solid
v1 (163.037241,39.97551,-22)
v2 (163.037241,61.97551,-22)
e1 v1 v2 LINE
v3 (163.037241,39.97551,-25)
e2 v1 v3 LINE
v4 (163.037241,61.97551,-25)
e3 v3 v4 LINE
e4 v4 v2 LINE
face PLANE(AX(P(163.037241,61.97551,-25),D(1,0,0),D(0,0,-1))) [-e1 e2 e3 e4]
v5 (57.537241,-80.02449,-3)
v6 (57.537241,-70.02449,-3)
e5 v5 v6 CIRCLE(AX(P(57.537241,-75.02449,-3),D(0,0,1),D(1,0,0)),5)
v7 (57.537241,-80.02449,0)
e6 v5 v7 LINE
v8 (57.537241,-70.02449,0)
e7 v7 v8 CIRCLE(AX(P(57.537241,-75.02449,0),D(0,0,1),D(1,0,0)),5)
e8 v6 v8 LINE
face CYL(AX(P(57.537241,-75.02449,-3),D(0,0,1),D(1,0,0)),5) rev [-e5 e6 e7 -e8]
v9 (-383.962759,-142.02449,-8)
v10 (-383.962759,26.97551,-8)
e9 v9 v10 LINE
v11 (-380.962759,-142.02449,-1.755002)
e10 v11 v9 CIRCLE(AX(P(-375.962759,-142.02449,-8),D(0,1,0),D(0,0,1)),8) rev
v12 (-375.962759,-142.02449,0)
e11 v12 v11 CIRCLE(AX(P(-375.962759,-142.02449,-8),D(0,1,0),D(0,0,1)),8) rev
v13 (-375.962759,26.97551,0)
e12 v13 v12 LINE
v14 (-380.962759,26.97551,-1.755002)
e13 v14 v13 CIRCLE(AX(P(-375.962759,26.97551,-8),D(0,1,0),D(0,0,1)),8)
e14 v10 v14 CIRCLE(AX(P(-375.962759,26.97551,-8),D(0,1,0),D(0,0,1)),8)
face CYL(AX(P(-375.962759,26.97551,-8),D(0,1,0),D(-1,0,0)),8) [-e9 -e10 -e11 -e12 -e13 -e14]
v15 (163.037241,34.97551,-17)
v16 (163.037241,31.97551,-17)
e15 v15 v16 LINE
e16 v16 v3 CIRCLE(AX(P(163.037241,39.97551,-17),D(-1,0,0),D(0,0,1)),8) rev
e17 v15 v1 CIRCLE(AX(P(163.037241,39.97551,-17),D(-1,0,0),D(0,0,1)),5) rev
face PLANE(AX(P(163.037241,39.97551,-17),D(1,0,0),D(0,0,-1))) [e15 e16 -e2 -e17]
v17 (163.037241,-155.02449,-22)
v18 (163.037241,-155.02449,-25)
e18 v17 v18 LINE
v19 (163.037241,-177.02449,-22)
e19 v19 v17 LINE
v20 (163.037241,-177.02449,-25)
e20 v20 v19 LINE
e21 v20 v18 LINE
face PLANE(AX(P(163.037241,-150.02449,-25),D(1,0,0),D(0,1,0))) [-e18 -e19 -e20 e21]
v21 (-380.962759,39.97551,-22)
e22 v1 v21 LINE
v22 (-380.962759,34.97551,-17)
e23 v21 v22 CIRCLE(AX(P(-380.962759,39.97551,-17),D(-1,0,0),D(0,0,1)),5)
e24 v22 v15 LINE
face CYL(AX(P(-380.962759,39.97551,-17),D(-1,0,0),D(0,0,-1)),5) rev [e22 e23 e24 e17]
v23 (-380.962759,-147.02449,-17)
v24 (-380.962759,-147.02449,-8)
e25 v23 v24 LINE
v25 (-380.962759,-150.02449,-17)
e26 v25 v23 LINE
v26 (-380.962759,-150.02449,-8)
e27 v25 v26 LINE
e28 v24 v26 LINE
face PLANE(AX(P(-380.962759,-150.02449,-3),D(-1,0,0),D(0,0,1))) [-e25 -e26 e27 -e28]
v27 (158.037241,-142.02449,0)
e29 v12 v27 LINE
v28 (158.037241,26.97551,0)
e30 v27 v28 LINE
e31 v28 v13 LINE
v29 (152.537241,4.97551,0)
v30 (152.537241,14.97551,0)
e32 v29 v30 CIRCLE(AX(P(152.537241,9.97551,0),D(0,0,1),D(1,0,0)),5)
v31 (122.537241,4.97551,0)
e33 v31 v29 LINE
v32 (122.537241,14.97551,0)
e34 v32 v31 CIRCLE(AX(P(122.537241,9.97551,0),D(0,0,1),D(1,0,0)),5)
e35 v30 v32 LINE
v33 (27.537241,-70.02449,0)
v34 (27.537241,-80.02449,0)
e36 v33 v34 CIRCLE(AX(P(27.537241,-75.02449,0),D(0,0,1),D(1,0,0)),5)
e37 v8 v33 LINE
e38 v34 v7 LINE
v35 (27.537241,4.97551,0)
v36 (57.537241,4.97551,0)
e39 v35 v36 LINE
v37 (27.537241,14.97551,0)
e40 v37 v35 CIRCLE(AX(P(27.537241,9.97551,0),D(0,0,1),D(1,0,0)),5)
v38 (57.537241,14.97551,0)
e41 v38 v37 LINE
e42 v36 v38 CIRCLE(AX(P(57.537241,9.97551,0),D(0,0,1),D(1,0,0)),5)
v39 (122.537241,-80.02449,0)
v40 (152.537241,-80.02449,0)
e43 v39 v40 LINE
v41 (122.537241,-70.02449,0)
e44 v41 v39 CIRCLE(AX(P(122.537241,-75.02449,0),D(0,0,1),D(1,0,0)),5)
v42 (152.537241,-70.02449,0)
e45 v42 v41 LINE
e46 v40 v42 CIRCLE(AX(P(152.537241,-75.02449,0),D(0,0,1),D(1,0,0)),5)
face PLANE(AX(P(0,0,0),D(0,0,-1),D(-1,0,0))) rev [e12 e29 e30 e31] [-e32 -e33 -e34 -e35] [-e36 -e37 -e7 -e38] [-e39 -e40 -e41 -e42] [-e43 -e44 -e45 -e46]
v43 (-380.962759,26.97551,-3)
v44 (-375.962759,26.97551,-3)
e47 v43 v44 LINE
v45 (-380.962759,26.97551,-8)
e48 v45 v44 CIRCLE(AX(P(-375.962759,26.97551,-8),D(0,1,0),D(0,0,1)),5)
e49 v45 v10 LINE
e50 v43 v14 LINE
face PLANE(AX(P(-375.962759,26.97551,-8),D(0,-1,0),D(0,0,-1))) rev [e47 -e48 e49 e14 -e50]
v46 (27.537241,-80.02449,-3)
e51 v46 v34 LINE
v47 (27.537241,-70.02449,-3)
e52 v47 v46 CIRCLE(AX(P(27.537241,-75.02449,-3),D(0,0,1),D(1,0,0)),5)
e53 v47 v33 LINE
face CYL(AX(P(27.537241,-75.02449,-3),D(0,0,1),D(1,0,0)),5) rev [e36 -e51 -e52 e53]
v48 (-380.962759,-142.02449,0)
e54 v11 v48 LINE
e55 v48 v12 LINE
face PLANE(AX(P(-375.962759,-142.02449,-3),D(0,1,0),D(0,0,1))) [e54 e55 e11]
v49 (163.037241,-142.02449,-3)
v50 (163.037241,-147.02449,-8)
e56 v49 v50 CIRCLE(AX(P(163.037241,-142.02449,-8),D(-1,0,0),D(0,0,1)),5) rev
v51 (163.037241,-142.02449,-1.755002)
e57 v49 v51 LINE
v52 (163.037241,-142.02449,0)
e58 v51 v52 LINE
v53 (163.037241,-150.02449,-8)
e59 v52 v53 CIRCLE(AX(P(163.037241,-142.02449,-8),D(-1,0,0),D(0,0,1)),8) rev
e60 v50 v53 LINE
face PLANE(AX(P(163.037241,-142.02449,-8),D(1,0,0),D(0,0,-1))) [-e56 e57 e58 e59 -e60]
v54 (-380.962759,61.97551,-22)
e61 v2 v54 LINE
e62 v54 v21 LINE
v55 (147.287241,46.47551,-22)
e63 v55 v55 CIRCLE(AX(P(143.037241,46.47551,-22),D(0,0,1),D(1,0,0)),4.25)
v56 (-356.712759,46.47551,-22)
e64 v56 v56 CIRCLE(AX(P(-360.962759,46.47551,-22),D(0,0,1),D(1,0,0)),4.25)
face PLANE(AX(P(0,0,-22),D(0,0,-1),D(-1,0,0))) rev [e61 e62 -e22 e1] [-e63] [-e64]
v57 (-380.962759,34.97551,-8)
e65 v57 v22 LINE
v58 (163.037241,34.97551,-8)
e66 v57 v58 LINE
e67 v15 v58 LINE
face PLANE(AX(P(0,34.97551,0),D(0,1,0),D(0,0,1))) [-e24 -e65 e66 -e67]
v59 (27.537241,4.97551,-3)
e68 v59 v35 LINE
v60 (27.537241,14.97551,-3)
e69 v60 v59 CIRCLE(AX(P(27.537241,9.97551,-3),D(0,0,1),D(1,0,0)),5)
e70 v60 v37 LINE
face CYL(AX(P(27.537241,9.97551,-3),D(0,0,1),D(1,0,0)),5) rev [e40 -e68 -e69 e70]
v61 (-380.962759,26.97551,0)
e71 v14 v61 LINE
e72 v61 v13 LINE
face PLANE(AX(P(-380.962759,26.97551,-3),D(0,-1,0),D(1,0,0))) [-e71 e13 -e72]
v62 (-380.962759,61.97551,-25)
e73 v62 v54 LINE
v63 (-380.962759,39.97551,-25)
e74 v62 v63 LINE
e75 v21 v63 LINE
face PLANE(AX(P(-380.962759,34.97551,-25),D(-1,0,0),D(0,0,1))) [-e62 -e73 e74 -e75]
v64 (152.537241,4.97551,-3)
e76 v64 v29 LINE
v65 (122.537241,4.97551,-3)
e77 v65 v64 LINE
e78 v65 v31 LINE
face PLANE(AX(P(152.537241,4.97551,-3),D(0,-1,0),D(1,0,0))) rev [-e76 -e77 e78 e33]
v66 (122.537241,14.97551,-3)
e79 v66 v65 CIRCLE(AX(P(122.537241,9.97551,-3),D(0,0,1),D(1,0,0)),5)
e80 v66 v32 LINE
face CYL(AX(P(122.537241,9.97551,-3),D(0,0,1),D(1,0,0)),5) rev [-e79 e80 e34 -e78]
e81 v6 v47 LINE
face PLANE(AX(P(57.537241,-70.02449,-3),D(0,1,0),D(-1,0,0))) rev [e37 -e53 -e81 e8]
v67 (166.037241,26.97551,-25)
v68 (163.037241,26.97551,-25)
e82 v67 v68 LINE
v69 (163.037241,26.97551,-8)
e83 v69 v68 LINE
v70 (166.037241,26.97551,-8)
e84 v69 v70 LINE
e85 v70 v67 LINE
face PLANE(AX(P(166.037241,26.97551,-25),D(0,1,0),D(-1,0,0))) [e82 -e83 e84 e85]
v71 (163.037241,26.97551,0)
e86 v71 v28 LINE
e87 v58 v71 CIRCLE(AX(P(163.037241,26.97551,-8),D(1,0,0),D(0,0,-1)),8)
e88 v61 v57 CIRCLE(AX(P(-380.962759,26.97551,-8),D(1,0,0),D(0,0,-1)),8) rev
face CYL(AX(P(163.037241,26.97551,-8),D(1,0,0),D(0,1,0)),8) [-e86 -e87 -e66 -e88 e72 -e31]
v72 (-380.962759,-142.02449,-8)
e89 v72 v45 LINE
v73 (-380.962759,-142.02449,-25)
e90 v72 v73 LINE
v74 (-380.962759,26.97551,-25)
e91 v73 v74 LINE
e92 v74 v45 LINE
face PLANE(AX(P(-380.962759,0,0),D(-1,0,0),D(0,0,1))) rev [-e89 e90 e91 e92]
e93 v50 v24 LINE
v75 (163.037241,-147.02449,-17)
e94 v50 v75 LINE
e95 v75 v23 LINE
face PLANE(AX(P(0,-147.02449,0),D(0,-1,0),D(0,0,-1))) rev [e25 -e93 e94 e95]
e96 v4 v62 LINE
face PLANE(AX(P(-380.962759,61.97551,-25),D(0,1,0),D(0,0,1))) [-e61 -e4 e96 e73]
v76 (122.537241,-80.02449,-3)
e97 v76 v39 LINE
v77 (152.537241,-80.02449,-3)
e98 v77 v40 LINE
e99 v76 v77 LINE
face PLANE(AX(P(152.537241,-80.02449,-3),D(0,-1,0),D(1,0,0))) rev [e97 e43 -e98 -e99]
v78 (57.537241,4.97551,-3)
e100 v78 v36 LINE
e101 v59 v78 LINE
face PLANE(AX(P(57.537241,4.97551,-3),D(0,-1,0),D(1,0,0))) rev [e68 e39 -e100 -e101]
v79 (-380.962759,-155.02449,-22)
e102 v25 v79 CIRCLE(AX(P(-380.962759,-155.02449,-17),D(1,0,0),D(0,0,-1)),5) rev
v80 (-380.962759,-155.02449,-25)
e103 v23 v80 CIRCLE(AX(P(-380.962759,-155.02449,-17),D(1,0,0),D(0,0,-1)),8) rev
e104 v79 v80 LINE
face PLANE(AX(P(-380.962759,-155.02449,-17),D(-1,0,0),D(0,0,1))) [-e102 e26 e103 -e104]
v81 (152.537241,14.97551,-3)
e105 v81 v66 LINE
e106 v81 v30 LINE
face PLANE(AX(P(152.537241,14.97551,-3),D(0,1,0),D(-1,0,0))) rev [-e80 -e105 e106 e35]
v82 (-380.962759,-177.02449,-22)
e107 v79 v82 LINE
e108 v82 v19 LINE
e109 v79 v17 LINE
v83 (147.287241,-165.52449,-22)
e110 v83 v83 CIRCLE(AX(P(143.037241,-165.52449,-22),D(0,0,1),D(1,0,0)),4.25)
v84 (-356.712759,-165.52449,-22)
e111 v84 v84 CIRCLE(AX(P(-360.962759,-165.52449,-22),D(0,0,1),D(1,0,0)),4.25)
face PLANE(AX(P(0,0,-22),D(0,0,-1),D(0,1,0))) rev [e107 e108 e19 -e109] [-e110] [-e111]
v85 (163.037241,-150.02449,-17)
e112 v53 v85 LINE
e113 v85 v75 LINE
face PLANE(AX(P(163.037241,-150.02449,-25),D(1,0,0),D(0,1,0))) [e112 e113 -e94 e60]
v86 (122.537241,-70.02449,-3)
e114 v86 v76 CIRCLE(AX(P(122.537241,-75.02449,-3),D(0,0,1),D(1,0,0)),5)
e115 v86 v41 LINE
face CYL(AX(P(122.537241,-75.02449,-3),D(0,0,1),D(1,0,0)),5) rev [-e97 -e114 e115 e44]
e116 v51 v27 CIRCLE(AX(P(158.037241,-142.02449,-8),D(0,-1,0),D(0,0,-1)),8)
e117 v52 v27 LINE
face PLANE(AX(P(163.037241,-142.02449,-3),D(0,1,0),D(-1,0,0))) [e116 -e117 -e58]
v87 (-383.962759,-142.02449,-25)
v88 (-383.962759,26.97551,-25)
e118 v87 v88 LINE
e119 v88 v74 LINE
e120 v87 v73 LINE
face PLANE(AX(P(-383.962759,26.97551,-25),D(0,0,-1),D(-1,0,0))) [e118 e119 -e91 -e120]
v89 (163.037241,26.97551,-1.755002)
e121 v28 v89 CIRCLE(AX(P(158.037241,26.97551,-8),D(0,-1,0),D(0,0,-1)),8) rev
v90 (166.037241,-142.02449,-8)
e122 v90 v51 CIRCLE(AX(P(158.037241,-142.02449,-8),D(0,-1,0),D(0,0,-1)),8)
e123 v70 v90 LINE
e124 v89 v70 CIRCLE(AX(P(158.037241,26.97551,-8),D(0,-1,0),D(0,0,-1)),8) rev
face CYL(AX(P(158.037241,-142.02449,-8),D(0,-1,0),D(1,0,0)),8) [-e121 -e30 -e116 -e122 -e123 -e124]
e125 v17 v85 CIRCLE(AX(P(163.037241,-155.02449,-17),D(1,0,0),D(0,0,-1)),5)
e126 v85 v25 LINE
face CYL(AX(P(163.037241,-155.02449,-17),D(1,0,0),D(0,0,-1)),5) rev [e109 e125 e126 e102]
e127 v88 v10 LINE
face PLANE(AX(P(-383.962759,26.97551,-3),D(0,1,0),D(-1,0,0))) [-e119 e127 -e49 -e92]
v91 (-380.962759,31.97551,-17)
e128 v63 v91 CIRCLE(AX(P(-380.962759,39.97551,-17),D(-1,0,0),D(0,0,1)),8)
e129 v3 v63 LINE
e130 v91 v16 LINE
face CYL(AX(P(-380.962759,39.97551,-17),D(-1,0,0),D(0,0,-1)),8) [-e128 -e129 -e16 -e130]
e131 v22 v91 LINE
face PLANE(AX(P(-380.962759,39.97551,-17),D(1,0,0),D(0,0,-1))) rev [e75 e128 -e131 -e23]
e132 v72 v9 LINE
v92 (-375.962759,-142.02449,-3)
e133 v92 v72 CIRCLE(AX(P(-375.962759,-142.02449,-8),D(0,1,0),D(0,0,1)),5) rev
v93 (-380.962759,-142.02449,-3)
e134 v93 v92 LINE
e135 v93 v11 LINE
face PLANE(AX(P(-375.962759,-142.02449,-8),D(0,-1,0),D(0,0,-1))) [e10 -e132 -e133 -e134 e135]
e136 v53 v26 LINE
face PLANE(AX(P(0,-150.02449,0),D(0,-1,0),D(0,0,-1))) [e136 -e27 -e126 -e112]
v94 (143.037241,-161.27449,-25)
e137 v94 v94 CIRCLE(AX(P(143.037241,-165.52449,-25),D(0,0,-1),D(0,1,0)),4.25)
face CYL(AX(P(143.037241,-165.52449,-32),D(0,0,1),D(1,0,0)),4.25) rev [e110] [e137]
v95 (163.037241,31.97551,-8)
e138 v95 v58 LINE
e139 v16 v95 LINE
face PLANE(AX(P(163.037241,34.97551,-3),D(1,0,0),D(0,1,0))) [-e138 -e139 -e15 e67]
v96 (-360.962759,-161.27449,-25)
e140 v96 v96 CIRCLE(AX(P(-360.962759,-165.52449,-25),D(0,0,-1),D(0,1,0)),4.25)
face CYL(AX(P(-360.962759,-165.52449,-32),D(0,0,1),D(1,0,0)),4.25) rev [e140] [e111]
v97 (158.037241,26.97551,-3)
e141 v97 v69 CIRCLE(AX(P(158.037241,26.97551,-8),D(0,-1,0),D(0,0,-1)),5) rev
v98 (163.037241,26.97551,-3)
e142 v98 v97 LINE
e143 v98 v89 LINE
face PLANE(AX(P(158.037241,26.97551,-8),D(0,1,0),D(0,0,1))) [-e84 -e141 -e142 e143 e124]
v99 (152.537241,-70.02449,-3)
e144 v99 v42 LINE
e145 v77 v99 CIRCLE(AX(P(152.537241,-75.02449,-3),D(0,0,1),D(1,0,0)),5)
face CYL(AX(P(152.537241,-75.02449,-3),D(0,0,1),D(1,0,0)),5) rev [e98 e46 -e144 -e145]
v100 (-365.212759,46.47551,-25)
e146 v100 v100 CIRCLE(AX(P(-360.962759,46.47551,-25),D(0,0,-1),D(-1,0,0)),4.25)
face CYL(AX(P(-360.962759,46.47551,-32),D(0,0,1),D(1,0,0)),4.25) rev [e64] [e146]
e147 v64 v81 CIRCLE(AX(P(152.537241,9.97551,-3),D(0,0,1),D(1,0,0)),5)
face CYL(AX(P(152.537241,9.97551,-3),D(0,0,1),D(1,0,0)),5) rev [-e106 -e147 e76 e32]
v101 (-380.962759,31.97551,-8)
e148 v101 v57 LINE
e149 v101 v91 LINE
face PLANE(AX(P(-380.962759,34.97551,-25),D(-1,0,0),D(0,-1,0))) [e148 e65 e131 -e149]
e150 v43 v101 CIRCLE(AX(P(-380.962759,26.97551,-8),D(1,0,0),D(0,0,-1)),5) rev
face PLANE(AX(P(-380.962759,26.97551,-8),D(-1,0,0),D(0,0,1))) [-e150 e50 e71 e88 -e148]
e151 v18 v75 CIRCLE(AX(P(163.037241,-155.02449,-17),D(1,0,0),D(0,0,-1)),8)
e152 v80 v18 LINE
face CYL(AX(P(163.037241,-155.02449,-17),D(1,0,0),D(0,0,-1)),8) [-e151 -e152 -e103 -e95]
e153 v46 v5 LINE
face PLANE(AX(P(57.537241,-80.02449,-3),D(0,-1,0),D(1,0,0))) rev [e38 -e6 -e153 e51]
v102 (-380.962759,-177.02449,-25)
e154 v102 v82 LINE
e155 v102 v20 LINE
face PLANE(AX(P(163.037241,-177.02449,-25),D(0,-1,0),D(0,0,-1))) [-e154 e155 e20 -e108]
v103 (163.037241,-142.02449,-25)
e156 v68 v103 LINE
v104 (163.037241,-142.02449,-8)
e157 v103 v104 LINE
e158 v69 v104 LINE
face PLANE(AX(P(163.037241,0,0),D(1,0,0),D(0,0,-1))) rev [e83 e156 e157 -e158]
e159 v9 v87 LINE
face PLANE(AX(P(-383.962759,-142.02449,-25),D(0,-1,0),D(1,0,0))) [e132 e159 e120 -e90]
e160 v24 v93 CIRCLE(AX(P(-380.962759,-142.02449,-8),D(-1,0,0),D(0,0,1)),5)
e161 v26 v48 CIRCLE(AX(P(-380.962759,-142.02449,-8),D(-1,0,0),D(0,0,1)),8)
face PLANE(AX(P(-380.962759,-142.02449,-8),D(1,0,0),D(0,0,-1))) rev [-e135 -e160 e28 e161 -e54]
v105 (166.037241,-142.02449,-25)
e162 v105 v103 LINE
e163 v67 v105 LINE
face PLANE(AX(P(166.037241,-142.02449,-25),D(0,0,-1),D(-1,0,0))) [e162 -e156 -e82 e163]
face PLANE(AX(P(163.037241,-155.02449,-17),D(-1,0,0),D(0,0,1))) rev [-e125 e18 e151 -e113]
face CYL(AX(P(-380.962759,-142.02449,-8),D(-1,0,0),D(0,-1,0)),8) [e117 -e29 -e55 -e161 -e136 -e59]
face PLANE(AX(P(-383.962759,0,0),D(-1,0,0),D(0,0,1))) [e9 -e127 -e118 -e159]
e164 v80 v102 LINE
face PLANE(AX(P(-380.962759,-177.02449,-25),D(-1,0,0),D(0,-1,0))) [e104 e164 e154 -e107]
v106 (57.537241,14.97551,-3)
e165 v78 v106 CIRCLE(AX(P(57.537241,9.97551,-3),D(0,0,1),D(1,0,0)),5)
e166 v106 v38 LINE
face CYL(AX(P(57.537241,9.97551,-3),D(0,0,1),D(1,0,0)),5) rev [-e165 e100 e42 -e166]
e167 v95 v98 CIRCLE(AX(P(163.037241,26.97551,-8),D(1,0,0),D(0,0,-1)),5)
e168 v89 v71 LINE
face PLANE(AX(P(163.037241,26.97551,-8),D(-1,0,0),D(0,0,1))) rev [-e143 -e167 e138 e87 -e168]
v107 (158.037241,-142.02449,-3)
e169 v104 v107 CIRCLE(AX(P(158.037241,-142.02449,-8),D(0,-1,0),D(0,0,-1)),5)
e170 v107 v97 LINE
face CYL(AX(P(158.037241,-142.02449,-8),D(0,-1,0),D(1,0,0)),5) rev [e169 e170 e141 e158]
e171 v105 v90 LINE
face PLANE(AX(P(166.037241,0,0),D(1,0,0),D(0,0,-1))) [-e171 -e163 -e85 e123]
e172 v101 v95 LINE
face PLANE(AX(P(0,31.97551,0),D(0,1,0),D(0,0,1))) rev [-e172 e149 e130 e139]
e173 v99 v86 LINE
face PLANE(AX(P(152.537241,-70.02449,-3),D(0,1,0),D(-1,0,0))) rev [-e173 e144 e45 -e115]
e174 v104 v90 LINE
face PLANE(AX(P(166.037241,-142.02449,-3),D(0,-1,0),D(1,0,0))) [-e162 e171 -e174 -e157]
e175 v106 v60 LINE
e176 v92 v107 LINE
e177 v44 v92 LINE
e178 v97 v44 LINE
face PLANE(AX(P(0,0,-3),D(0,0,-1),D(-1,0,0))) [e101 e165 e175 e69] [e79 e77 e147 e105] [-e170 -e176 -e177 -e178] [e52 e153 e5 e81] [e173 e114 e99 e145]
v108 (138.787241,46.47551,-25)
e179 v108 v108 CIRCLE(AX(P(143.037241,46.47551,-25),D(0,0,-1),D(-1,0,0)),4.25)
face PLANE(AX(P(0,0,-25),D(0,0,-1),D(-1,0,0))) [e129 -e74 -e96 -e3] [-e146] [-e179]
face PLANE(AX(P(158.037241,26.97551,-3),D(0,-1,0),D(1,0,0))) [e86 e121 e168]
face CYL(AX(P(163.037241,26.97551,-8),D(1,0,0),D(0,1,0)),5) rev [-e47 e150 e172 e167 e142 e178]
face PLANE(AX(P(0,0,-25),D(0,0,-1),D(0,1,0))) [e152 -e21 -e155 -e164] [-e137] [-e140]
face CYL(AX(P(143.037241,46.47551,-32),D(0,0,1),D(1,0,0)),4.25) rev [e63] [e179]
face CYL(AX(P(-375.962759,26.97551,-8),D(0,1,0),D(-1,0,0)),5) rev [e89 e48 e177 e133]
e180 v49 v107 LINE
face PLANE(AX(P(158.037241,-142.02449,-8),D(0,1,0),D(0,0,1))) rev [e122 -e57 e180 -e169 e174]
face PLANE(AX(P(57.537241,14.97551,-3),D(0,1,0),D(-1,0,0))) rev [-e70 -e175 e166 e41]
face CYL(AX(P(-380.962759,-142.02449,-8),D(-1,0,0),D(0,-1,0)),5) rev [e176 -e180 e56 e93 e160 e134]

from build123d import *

# Parameters (mm, degrees)
SKETCH1_W                    = 544
SKETCH1_H                    = 185
BASE_FLANGE1_DEPTH           = 3
EDGE_FLANGE1_STRIP_W         = 22
EDGE_FLANGE1_STRIP_H         = 3
EDGE_FLANGE1_STRIP_CUT_DEPTH = 544
EDGE_FLANGE1_DEPTH           = 544
EDGE_FLANGE2_STRIP_W         = 22
EDGE_FLANGE2_STRIP_H         = 3
EDGE_FLANGE2_STRIP_CUT_DEPTH = 544
EDGE_FLANGE2_DEPTH           = 544
EDGE_FLANGE3_STRIP_W         = 22
EDGE_FLANGE3_STRIP_H         = 3
EDGE_FLANGE3_STRIP_CUT_DEPTH = 544
EDGE_FLANGE3_DEPTH           = 544
EDGE_FLANGE4_STRIP_W         = 22
EDGE_FLANGE4_STRIP_H         = 3
EDGE_FLANGE4_STRIP_CUT_DEPTH = 544
EDGE_FLANGE4_DEPTH           = 544
EDGE_FLANGE5_STRIP_W         = 22
EDGE_FLANGE5_STRIP_H         = 3
EDGE_FLANGE5_STRIP_CUT_DEPTH = 169
EDGE_FLANGE5_DEPTH           = 169
EDGE_FLANGE6_STRIP_W         = 22
EDGE_FLANGE6_STRIP_H         = 3
EDGE_FLANGE6_STRIP_CUT_DEPTH = 169
EDGE_FLANGE6_DEPTH           = 169
SKETCH26_R                   = 4.25
CUT_EXTRUDE1_DEPTH           = 10
SKETCH27_R                   = 4.25
CUT_EXTRUDE2_DEPTH           = 10


# Sheet-metal steps are written as plain solids
with BuildPart() as part:
    # Sketch1 → Base-Flange1 (new body)
    with BuildSketch(Plane.XY):
        with Locations((-108.962758621, -57.524490421)):
            Rectangle(SKETCH1_W, SKETCH1_H)
        with BuildLine():
            Line((152.537241379, 4.975509579), (122.537241379, 4.975509579))
            ThreePointArc((122.537241379, 4.975509579), (117.537241379, 9.975509579), (122.537241379, 14.975509579))
            Line((122.537241379, 14.975509579), (152.537241379, 14.975509579))
            ThreePointArc((152.537241379, 14.975509579), (157.537241379, 9.975509579), (152.537241379, 4.975509579))
        make_face(mode=Mode.SUBTRACT)
        with BuildLine():
            Line((57.537241379, 4.975509579), (27.537241379, 4.975509579))
            ThreePointArc((27.537241379, 4.975509579), (22.537241379, 9.975509579), (27.537241379, 14.975509579))
            Line((27.537241379, 14.975509579), (57.537241379, 14.975509579))
            ThreePointArc((57.537241379, 14.975509579), (62.537241379, 9.975509579), (57.537241379, 4.975509579))
        make_face(mode=Mode.SUBTRACT)
        with BuildLine():
            Line((152.537241379, -80.024490421), (122.537241379, -80.024490421))
            ThreePointArc((122.537241379, -80.024490421), (117.537241379, -75.024490421), (122.537241379, -70.024490421))
            Line((122.537241379, -70.024490421), (152.537241379, -70.024490421))
            ThreePointArc((152.537241379, -70.024490421), (157.537241379, -75.024490421), (152.537241379, -80.024490421))
        make_face(mode=Mode.SUBTRACT)
        with BuildLine():
            Line((57.537241379, -80.024490421), (27.537241379, -80.024490421))
            ThreePointArc((27.537241379, -80.024490421), (22.537241379, -75.024490421), (27.537241379, -70.024490421))
            Line((27.537241379, -70.024490421), (57.537241379, -70.024490421))
            ThreePointArc((57.537241379, -70.024490421), (62.537241379, -75.024490421), (57.537241379, -80.024490421))
        make_face(mode=Mode.SUBTRACT)
    extrude(amount=-BASE_FLANGE1_DEPTH)

    # Edge-Flange1 strip (across the edge) → Edge-Flange1 strip cut (cut)
    with BuildSketch(Plane(origin=(-380.962758621, 34.975509579, -3), x_dir=(0, -1, 0), z_dir=(1, 0, 0))):
        with Locations((-3, -1.5)):
            Rectangle(EDGE_FLANGE1_STRIP_W, EDGE_FLANGE1_STRIP_H)
    extrude(amount=EDGE_FLANGE1_STRIP_CUT_DEPTH, mode=Mode.SUBTRACT)

    # Edge-Flange1 section (across the edge) → Edge-Flange1 (add)
    with BuildSketch(Plane(origin=(-380.962758621, 34.975509579, -3), x_dir=(0, -1, 0), z_dir=(1, 0, 0))):
        with BuildLine():
            Line((0, 5), (0, 22))
            Line((0, 22), (3, 22))
            Line((3, 22), (3, 5))
            ThreePointArc((3, 5), (4.464466094, 1.464466094), (8, 0))
            Line((8, 0), (8, -3))
            ThreePointArc((8, -3), (2.343145751, -0.656854249), (0, 5))
        make_face()
    extrude(amount=EDGE_FLANGE1_DEPTH)

    # Edge-Flange2 strip (across the edge) → Edge-Flange2 strip cut (cut)
    with BuildSketch(Plane(origin=(163.037241379, -150.024490421, -3), x_dir=(0, 1, 0), z_dir=(-1, 0, 0))):
        with Locations((-3, -1.5)):
            Rectangle(EDGE_FLANGE2_STRIP_W, EDGE_FLANGE2_STRIP_H)
    extrude(amount=EDGE_FLANGE2_STRIP_CUT_DEPTH, mode=Mode.SUBTRACT)

    # Edge-Flange2 section (across the edge) → Edge-Flange2 (add)
    with BuildSketch(Plane(origin=(163.037241379, -150.024490421, -3), x_dir=(0, 1, 0), z_dir=(-1, 0, 0))):
        with BuildLine():
            Line((0, 5), (0, 22))
            Line((0, 22), (3, 22))
            Line((3, 22), (3, 5))
            ThreePointArc((3, 5), (4.464466094, 1.464466094), (8, 0))
            Line((8, 0), (8, -3))
            ThreePointArc((8, -3), (2.343145751, -0.656854249), (0, 5))
        make_face()
    extrude(amount=EDGE_FLANGE2_DEPTH)

    # Edge-Flange3 strip (across the edge) → Edge-Flange3 strip cut (cut)
    with BuildSketch(Plane(origin=(-380.962758621, -150.024490421, -25), x_dir=(0, 0, 1), z_dir=(1, 0, 0))):
        with Locations((-3, -1.5)):
            Rectangle(EDGE_FLANGE3_STRIP_W, EDGE_FLANGE3_STRIP_H)
    extrude(amount=EDGE_FLANGE3_STRIP_CUT_DEPTH, mode=Mode.SUBTRACT)

    # Edge-Flange3 section (across the edge) → Edge-Flange3 (add)
    with BuildSketch(Plane(origin=(-380.962758621, -150.024490421, -25), x_dir=(0, 0, 1), z_dir=(1, 0, 0))):
        with BuildLine():
            Line((0, 5), (0, 27))
            Line((0, 27), (3, 27))
            Line((3, 27), (3, 5))
            ThreePointArc((3, 5), (4.464466094, 1.464466094), (8, 0))
            Line((8, 0), (8, -3))
            ThreePointArc((8, -3), (2.343145751, -0.656854249), (0, 5))
        make_face()
    extrude(amount=EDGE_FLANGE3_DEPTH)

    # Edge-Flange4 strip (across the edge) → Edge-Flange4 strip cut (cut)
    with BuildSketch(Plane(origin=(163.037241379, 34.975509579, -25), x_dir=(0, 0, 1), z_dir=(-1, 0, 0))):
        with Locations((-3, -1.5)):
            Rectangle(EDGE_FLANGE4_STRIP_W, EDGE_FLANGE4_STRIP_H)
    extrude(amount=EDGE_FLANGE4_STRIP_CUT_DEPTH, mode=Mode.SUBTRACT)

    # Edge-Flange4 section (across the edge) → Edge-Flange4 (add)
    with BuildSketch(Plane(origin=(163.037241379, 34.975509579, -25), x_dir=(0, 0, 1), z_dir=(-1, 0, 0))):
        with BuildLine():
            Line((0, 5), (0, 27))
            Line((0, 27), (3, 27))
            Line((3, 27), (3, 5))
            ThreePointArc((3, 5), (4.464466094, 1.464466094), (8, 0))
            Line((8, 0), (8, -3))
            ThreePointArc((8, -3), (2.343145751, -0.656854249), (0, 5))
        make_face()
    extrude(amount=EDGE_FLANGE4_DEPTH)

    # Edge-Flange5 strip (across the edge) → Edge-Flange5 strip cut (cut)
    with BuildSketch(Plane(origin=(163.037241379, 26.975509579, -3), x_dir=(-1, 0, 0), z_dir=(0, -1, 0))):
        with Locations((-6, -1.5)):
            Rectangle(EDGE_FLANGE5_STRIP_W, EDGE_FLANGE5_STRIP_H)
    extrude(amount=EDGE_FLANGE5_STRIP_CUT_DEPTH, mode=Mode.SUBTRACT)

    # Edge-Flange5 section (across the edge) → Edge-Flange5 (add)
    with BuildSketch(Plane(origin=(163.037241379, 26.975509579, -3), x_dir=(-1, 0, 0), z_dir=(0, -1, 0))):
        with BuildLine():
            Line((-3, 5), (-3, 22))
            Line((-3, 22), (0, 22))
            Line((0, 22), (0, 5))
            ThreePointArc((0, 5), (1.464466094, 1.464466094), (5, 0))
            Line((5, 0), (5, -3))
            ThreePointArc((5, -3), (-0.656854249, -0.656854249), (-3, 5))
        make_face()
    extrude(amount=EDGE_FLANGE5_DEPTH)

    # Edge-Flange6 strip (across the edge) → Edge-Flange6 strip cut (cut)
    with BuildSketch(Plane(origin=(-380.962758621, -142.024490421, -3), x_dir=(1, 0, 0), z_dir=(0, 1, 0))):
        with Locations((-6, -1.5)):
            Rectangle(EDGE_FLANGE6_STRIP_W, EDGE_FLANGE6_STRIP_H)
    extrude(amount=EDGE_FLANGE6_STRIP_CUT_DEPTH, mode=Mode.SUBTRACT)

    # Edge-Flange6 section (across the edge) → Edge-Flange6 (add)
    with BuildSketch(Plane(origin=(-380.962758621, -142.024490421, -3), x_dir=(1, 0, 0), z_dir=(0, 1, 0))):
        with BuildLine():
            Line((-3, 5), (-3, 22))
            Line((-3, 22), (0, 22))
            Line((0, 22), (0, 5))
            ThreePointArc((0, 5), (1.464466094, 1.464466094), (5, 0))
            Line((5, 0), (5, -3))
            ThreePointArc((5, -3), (-0.656854249, -0.656854249), (-3, 5))
        make_face()
    extrude(amount=EDGE_FLANGE6_DEPTH)

    # Sketch26 → Cut-Extrude1 (cut)
    with BuildSketch(Plane.XY.offset(-22)):
        with Locations((143.037241379, -165.524490421)):
            Circle(SKETCH26_R)
        with Locations((-360.962758621, -165.524490421)):
            Circle(SKETCH26_R)
    extrude(amount=-CUT_EXTRUDE1_DEPTH, mode=Mode.SUBTRACT)

    # Sketch27 → Cut-Extrude2 (cut)
    with BuildSketch(Plane.XY.offset(-22)):
        with Locations((143.037241379, 46.475509579)):
            Circle(SKETCH27_R)
        with Locations((-360.962758621, 46.475509579)):
            Circle(SKETCH27_R)
    extrude(amount=-CUT_EXTRUDE2_DEPTH, mode=Mode.SUBTRACT)


solid = part.part
